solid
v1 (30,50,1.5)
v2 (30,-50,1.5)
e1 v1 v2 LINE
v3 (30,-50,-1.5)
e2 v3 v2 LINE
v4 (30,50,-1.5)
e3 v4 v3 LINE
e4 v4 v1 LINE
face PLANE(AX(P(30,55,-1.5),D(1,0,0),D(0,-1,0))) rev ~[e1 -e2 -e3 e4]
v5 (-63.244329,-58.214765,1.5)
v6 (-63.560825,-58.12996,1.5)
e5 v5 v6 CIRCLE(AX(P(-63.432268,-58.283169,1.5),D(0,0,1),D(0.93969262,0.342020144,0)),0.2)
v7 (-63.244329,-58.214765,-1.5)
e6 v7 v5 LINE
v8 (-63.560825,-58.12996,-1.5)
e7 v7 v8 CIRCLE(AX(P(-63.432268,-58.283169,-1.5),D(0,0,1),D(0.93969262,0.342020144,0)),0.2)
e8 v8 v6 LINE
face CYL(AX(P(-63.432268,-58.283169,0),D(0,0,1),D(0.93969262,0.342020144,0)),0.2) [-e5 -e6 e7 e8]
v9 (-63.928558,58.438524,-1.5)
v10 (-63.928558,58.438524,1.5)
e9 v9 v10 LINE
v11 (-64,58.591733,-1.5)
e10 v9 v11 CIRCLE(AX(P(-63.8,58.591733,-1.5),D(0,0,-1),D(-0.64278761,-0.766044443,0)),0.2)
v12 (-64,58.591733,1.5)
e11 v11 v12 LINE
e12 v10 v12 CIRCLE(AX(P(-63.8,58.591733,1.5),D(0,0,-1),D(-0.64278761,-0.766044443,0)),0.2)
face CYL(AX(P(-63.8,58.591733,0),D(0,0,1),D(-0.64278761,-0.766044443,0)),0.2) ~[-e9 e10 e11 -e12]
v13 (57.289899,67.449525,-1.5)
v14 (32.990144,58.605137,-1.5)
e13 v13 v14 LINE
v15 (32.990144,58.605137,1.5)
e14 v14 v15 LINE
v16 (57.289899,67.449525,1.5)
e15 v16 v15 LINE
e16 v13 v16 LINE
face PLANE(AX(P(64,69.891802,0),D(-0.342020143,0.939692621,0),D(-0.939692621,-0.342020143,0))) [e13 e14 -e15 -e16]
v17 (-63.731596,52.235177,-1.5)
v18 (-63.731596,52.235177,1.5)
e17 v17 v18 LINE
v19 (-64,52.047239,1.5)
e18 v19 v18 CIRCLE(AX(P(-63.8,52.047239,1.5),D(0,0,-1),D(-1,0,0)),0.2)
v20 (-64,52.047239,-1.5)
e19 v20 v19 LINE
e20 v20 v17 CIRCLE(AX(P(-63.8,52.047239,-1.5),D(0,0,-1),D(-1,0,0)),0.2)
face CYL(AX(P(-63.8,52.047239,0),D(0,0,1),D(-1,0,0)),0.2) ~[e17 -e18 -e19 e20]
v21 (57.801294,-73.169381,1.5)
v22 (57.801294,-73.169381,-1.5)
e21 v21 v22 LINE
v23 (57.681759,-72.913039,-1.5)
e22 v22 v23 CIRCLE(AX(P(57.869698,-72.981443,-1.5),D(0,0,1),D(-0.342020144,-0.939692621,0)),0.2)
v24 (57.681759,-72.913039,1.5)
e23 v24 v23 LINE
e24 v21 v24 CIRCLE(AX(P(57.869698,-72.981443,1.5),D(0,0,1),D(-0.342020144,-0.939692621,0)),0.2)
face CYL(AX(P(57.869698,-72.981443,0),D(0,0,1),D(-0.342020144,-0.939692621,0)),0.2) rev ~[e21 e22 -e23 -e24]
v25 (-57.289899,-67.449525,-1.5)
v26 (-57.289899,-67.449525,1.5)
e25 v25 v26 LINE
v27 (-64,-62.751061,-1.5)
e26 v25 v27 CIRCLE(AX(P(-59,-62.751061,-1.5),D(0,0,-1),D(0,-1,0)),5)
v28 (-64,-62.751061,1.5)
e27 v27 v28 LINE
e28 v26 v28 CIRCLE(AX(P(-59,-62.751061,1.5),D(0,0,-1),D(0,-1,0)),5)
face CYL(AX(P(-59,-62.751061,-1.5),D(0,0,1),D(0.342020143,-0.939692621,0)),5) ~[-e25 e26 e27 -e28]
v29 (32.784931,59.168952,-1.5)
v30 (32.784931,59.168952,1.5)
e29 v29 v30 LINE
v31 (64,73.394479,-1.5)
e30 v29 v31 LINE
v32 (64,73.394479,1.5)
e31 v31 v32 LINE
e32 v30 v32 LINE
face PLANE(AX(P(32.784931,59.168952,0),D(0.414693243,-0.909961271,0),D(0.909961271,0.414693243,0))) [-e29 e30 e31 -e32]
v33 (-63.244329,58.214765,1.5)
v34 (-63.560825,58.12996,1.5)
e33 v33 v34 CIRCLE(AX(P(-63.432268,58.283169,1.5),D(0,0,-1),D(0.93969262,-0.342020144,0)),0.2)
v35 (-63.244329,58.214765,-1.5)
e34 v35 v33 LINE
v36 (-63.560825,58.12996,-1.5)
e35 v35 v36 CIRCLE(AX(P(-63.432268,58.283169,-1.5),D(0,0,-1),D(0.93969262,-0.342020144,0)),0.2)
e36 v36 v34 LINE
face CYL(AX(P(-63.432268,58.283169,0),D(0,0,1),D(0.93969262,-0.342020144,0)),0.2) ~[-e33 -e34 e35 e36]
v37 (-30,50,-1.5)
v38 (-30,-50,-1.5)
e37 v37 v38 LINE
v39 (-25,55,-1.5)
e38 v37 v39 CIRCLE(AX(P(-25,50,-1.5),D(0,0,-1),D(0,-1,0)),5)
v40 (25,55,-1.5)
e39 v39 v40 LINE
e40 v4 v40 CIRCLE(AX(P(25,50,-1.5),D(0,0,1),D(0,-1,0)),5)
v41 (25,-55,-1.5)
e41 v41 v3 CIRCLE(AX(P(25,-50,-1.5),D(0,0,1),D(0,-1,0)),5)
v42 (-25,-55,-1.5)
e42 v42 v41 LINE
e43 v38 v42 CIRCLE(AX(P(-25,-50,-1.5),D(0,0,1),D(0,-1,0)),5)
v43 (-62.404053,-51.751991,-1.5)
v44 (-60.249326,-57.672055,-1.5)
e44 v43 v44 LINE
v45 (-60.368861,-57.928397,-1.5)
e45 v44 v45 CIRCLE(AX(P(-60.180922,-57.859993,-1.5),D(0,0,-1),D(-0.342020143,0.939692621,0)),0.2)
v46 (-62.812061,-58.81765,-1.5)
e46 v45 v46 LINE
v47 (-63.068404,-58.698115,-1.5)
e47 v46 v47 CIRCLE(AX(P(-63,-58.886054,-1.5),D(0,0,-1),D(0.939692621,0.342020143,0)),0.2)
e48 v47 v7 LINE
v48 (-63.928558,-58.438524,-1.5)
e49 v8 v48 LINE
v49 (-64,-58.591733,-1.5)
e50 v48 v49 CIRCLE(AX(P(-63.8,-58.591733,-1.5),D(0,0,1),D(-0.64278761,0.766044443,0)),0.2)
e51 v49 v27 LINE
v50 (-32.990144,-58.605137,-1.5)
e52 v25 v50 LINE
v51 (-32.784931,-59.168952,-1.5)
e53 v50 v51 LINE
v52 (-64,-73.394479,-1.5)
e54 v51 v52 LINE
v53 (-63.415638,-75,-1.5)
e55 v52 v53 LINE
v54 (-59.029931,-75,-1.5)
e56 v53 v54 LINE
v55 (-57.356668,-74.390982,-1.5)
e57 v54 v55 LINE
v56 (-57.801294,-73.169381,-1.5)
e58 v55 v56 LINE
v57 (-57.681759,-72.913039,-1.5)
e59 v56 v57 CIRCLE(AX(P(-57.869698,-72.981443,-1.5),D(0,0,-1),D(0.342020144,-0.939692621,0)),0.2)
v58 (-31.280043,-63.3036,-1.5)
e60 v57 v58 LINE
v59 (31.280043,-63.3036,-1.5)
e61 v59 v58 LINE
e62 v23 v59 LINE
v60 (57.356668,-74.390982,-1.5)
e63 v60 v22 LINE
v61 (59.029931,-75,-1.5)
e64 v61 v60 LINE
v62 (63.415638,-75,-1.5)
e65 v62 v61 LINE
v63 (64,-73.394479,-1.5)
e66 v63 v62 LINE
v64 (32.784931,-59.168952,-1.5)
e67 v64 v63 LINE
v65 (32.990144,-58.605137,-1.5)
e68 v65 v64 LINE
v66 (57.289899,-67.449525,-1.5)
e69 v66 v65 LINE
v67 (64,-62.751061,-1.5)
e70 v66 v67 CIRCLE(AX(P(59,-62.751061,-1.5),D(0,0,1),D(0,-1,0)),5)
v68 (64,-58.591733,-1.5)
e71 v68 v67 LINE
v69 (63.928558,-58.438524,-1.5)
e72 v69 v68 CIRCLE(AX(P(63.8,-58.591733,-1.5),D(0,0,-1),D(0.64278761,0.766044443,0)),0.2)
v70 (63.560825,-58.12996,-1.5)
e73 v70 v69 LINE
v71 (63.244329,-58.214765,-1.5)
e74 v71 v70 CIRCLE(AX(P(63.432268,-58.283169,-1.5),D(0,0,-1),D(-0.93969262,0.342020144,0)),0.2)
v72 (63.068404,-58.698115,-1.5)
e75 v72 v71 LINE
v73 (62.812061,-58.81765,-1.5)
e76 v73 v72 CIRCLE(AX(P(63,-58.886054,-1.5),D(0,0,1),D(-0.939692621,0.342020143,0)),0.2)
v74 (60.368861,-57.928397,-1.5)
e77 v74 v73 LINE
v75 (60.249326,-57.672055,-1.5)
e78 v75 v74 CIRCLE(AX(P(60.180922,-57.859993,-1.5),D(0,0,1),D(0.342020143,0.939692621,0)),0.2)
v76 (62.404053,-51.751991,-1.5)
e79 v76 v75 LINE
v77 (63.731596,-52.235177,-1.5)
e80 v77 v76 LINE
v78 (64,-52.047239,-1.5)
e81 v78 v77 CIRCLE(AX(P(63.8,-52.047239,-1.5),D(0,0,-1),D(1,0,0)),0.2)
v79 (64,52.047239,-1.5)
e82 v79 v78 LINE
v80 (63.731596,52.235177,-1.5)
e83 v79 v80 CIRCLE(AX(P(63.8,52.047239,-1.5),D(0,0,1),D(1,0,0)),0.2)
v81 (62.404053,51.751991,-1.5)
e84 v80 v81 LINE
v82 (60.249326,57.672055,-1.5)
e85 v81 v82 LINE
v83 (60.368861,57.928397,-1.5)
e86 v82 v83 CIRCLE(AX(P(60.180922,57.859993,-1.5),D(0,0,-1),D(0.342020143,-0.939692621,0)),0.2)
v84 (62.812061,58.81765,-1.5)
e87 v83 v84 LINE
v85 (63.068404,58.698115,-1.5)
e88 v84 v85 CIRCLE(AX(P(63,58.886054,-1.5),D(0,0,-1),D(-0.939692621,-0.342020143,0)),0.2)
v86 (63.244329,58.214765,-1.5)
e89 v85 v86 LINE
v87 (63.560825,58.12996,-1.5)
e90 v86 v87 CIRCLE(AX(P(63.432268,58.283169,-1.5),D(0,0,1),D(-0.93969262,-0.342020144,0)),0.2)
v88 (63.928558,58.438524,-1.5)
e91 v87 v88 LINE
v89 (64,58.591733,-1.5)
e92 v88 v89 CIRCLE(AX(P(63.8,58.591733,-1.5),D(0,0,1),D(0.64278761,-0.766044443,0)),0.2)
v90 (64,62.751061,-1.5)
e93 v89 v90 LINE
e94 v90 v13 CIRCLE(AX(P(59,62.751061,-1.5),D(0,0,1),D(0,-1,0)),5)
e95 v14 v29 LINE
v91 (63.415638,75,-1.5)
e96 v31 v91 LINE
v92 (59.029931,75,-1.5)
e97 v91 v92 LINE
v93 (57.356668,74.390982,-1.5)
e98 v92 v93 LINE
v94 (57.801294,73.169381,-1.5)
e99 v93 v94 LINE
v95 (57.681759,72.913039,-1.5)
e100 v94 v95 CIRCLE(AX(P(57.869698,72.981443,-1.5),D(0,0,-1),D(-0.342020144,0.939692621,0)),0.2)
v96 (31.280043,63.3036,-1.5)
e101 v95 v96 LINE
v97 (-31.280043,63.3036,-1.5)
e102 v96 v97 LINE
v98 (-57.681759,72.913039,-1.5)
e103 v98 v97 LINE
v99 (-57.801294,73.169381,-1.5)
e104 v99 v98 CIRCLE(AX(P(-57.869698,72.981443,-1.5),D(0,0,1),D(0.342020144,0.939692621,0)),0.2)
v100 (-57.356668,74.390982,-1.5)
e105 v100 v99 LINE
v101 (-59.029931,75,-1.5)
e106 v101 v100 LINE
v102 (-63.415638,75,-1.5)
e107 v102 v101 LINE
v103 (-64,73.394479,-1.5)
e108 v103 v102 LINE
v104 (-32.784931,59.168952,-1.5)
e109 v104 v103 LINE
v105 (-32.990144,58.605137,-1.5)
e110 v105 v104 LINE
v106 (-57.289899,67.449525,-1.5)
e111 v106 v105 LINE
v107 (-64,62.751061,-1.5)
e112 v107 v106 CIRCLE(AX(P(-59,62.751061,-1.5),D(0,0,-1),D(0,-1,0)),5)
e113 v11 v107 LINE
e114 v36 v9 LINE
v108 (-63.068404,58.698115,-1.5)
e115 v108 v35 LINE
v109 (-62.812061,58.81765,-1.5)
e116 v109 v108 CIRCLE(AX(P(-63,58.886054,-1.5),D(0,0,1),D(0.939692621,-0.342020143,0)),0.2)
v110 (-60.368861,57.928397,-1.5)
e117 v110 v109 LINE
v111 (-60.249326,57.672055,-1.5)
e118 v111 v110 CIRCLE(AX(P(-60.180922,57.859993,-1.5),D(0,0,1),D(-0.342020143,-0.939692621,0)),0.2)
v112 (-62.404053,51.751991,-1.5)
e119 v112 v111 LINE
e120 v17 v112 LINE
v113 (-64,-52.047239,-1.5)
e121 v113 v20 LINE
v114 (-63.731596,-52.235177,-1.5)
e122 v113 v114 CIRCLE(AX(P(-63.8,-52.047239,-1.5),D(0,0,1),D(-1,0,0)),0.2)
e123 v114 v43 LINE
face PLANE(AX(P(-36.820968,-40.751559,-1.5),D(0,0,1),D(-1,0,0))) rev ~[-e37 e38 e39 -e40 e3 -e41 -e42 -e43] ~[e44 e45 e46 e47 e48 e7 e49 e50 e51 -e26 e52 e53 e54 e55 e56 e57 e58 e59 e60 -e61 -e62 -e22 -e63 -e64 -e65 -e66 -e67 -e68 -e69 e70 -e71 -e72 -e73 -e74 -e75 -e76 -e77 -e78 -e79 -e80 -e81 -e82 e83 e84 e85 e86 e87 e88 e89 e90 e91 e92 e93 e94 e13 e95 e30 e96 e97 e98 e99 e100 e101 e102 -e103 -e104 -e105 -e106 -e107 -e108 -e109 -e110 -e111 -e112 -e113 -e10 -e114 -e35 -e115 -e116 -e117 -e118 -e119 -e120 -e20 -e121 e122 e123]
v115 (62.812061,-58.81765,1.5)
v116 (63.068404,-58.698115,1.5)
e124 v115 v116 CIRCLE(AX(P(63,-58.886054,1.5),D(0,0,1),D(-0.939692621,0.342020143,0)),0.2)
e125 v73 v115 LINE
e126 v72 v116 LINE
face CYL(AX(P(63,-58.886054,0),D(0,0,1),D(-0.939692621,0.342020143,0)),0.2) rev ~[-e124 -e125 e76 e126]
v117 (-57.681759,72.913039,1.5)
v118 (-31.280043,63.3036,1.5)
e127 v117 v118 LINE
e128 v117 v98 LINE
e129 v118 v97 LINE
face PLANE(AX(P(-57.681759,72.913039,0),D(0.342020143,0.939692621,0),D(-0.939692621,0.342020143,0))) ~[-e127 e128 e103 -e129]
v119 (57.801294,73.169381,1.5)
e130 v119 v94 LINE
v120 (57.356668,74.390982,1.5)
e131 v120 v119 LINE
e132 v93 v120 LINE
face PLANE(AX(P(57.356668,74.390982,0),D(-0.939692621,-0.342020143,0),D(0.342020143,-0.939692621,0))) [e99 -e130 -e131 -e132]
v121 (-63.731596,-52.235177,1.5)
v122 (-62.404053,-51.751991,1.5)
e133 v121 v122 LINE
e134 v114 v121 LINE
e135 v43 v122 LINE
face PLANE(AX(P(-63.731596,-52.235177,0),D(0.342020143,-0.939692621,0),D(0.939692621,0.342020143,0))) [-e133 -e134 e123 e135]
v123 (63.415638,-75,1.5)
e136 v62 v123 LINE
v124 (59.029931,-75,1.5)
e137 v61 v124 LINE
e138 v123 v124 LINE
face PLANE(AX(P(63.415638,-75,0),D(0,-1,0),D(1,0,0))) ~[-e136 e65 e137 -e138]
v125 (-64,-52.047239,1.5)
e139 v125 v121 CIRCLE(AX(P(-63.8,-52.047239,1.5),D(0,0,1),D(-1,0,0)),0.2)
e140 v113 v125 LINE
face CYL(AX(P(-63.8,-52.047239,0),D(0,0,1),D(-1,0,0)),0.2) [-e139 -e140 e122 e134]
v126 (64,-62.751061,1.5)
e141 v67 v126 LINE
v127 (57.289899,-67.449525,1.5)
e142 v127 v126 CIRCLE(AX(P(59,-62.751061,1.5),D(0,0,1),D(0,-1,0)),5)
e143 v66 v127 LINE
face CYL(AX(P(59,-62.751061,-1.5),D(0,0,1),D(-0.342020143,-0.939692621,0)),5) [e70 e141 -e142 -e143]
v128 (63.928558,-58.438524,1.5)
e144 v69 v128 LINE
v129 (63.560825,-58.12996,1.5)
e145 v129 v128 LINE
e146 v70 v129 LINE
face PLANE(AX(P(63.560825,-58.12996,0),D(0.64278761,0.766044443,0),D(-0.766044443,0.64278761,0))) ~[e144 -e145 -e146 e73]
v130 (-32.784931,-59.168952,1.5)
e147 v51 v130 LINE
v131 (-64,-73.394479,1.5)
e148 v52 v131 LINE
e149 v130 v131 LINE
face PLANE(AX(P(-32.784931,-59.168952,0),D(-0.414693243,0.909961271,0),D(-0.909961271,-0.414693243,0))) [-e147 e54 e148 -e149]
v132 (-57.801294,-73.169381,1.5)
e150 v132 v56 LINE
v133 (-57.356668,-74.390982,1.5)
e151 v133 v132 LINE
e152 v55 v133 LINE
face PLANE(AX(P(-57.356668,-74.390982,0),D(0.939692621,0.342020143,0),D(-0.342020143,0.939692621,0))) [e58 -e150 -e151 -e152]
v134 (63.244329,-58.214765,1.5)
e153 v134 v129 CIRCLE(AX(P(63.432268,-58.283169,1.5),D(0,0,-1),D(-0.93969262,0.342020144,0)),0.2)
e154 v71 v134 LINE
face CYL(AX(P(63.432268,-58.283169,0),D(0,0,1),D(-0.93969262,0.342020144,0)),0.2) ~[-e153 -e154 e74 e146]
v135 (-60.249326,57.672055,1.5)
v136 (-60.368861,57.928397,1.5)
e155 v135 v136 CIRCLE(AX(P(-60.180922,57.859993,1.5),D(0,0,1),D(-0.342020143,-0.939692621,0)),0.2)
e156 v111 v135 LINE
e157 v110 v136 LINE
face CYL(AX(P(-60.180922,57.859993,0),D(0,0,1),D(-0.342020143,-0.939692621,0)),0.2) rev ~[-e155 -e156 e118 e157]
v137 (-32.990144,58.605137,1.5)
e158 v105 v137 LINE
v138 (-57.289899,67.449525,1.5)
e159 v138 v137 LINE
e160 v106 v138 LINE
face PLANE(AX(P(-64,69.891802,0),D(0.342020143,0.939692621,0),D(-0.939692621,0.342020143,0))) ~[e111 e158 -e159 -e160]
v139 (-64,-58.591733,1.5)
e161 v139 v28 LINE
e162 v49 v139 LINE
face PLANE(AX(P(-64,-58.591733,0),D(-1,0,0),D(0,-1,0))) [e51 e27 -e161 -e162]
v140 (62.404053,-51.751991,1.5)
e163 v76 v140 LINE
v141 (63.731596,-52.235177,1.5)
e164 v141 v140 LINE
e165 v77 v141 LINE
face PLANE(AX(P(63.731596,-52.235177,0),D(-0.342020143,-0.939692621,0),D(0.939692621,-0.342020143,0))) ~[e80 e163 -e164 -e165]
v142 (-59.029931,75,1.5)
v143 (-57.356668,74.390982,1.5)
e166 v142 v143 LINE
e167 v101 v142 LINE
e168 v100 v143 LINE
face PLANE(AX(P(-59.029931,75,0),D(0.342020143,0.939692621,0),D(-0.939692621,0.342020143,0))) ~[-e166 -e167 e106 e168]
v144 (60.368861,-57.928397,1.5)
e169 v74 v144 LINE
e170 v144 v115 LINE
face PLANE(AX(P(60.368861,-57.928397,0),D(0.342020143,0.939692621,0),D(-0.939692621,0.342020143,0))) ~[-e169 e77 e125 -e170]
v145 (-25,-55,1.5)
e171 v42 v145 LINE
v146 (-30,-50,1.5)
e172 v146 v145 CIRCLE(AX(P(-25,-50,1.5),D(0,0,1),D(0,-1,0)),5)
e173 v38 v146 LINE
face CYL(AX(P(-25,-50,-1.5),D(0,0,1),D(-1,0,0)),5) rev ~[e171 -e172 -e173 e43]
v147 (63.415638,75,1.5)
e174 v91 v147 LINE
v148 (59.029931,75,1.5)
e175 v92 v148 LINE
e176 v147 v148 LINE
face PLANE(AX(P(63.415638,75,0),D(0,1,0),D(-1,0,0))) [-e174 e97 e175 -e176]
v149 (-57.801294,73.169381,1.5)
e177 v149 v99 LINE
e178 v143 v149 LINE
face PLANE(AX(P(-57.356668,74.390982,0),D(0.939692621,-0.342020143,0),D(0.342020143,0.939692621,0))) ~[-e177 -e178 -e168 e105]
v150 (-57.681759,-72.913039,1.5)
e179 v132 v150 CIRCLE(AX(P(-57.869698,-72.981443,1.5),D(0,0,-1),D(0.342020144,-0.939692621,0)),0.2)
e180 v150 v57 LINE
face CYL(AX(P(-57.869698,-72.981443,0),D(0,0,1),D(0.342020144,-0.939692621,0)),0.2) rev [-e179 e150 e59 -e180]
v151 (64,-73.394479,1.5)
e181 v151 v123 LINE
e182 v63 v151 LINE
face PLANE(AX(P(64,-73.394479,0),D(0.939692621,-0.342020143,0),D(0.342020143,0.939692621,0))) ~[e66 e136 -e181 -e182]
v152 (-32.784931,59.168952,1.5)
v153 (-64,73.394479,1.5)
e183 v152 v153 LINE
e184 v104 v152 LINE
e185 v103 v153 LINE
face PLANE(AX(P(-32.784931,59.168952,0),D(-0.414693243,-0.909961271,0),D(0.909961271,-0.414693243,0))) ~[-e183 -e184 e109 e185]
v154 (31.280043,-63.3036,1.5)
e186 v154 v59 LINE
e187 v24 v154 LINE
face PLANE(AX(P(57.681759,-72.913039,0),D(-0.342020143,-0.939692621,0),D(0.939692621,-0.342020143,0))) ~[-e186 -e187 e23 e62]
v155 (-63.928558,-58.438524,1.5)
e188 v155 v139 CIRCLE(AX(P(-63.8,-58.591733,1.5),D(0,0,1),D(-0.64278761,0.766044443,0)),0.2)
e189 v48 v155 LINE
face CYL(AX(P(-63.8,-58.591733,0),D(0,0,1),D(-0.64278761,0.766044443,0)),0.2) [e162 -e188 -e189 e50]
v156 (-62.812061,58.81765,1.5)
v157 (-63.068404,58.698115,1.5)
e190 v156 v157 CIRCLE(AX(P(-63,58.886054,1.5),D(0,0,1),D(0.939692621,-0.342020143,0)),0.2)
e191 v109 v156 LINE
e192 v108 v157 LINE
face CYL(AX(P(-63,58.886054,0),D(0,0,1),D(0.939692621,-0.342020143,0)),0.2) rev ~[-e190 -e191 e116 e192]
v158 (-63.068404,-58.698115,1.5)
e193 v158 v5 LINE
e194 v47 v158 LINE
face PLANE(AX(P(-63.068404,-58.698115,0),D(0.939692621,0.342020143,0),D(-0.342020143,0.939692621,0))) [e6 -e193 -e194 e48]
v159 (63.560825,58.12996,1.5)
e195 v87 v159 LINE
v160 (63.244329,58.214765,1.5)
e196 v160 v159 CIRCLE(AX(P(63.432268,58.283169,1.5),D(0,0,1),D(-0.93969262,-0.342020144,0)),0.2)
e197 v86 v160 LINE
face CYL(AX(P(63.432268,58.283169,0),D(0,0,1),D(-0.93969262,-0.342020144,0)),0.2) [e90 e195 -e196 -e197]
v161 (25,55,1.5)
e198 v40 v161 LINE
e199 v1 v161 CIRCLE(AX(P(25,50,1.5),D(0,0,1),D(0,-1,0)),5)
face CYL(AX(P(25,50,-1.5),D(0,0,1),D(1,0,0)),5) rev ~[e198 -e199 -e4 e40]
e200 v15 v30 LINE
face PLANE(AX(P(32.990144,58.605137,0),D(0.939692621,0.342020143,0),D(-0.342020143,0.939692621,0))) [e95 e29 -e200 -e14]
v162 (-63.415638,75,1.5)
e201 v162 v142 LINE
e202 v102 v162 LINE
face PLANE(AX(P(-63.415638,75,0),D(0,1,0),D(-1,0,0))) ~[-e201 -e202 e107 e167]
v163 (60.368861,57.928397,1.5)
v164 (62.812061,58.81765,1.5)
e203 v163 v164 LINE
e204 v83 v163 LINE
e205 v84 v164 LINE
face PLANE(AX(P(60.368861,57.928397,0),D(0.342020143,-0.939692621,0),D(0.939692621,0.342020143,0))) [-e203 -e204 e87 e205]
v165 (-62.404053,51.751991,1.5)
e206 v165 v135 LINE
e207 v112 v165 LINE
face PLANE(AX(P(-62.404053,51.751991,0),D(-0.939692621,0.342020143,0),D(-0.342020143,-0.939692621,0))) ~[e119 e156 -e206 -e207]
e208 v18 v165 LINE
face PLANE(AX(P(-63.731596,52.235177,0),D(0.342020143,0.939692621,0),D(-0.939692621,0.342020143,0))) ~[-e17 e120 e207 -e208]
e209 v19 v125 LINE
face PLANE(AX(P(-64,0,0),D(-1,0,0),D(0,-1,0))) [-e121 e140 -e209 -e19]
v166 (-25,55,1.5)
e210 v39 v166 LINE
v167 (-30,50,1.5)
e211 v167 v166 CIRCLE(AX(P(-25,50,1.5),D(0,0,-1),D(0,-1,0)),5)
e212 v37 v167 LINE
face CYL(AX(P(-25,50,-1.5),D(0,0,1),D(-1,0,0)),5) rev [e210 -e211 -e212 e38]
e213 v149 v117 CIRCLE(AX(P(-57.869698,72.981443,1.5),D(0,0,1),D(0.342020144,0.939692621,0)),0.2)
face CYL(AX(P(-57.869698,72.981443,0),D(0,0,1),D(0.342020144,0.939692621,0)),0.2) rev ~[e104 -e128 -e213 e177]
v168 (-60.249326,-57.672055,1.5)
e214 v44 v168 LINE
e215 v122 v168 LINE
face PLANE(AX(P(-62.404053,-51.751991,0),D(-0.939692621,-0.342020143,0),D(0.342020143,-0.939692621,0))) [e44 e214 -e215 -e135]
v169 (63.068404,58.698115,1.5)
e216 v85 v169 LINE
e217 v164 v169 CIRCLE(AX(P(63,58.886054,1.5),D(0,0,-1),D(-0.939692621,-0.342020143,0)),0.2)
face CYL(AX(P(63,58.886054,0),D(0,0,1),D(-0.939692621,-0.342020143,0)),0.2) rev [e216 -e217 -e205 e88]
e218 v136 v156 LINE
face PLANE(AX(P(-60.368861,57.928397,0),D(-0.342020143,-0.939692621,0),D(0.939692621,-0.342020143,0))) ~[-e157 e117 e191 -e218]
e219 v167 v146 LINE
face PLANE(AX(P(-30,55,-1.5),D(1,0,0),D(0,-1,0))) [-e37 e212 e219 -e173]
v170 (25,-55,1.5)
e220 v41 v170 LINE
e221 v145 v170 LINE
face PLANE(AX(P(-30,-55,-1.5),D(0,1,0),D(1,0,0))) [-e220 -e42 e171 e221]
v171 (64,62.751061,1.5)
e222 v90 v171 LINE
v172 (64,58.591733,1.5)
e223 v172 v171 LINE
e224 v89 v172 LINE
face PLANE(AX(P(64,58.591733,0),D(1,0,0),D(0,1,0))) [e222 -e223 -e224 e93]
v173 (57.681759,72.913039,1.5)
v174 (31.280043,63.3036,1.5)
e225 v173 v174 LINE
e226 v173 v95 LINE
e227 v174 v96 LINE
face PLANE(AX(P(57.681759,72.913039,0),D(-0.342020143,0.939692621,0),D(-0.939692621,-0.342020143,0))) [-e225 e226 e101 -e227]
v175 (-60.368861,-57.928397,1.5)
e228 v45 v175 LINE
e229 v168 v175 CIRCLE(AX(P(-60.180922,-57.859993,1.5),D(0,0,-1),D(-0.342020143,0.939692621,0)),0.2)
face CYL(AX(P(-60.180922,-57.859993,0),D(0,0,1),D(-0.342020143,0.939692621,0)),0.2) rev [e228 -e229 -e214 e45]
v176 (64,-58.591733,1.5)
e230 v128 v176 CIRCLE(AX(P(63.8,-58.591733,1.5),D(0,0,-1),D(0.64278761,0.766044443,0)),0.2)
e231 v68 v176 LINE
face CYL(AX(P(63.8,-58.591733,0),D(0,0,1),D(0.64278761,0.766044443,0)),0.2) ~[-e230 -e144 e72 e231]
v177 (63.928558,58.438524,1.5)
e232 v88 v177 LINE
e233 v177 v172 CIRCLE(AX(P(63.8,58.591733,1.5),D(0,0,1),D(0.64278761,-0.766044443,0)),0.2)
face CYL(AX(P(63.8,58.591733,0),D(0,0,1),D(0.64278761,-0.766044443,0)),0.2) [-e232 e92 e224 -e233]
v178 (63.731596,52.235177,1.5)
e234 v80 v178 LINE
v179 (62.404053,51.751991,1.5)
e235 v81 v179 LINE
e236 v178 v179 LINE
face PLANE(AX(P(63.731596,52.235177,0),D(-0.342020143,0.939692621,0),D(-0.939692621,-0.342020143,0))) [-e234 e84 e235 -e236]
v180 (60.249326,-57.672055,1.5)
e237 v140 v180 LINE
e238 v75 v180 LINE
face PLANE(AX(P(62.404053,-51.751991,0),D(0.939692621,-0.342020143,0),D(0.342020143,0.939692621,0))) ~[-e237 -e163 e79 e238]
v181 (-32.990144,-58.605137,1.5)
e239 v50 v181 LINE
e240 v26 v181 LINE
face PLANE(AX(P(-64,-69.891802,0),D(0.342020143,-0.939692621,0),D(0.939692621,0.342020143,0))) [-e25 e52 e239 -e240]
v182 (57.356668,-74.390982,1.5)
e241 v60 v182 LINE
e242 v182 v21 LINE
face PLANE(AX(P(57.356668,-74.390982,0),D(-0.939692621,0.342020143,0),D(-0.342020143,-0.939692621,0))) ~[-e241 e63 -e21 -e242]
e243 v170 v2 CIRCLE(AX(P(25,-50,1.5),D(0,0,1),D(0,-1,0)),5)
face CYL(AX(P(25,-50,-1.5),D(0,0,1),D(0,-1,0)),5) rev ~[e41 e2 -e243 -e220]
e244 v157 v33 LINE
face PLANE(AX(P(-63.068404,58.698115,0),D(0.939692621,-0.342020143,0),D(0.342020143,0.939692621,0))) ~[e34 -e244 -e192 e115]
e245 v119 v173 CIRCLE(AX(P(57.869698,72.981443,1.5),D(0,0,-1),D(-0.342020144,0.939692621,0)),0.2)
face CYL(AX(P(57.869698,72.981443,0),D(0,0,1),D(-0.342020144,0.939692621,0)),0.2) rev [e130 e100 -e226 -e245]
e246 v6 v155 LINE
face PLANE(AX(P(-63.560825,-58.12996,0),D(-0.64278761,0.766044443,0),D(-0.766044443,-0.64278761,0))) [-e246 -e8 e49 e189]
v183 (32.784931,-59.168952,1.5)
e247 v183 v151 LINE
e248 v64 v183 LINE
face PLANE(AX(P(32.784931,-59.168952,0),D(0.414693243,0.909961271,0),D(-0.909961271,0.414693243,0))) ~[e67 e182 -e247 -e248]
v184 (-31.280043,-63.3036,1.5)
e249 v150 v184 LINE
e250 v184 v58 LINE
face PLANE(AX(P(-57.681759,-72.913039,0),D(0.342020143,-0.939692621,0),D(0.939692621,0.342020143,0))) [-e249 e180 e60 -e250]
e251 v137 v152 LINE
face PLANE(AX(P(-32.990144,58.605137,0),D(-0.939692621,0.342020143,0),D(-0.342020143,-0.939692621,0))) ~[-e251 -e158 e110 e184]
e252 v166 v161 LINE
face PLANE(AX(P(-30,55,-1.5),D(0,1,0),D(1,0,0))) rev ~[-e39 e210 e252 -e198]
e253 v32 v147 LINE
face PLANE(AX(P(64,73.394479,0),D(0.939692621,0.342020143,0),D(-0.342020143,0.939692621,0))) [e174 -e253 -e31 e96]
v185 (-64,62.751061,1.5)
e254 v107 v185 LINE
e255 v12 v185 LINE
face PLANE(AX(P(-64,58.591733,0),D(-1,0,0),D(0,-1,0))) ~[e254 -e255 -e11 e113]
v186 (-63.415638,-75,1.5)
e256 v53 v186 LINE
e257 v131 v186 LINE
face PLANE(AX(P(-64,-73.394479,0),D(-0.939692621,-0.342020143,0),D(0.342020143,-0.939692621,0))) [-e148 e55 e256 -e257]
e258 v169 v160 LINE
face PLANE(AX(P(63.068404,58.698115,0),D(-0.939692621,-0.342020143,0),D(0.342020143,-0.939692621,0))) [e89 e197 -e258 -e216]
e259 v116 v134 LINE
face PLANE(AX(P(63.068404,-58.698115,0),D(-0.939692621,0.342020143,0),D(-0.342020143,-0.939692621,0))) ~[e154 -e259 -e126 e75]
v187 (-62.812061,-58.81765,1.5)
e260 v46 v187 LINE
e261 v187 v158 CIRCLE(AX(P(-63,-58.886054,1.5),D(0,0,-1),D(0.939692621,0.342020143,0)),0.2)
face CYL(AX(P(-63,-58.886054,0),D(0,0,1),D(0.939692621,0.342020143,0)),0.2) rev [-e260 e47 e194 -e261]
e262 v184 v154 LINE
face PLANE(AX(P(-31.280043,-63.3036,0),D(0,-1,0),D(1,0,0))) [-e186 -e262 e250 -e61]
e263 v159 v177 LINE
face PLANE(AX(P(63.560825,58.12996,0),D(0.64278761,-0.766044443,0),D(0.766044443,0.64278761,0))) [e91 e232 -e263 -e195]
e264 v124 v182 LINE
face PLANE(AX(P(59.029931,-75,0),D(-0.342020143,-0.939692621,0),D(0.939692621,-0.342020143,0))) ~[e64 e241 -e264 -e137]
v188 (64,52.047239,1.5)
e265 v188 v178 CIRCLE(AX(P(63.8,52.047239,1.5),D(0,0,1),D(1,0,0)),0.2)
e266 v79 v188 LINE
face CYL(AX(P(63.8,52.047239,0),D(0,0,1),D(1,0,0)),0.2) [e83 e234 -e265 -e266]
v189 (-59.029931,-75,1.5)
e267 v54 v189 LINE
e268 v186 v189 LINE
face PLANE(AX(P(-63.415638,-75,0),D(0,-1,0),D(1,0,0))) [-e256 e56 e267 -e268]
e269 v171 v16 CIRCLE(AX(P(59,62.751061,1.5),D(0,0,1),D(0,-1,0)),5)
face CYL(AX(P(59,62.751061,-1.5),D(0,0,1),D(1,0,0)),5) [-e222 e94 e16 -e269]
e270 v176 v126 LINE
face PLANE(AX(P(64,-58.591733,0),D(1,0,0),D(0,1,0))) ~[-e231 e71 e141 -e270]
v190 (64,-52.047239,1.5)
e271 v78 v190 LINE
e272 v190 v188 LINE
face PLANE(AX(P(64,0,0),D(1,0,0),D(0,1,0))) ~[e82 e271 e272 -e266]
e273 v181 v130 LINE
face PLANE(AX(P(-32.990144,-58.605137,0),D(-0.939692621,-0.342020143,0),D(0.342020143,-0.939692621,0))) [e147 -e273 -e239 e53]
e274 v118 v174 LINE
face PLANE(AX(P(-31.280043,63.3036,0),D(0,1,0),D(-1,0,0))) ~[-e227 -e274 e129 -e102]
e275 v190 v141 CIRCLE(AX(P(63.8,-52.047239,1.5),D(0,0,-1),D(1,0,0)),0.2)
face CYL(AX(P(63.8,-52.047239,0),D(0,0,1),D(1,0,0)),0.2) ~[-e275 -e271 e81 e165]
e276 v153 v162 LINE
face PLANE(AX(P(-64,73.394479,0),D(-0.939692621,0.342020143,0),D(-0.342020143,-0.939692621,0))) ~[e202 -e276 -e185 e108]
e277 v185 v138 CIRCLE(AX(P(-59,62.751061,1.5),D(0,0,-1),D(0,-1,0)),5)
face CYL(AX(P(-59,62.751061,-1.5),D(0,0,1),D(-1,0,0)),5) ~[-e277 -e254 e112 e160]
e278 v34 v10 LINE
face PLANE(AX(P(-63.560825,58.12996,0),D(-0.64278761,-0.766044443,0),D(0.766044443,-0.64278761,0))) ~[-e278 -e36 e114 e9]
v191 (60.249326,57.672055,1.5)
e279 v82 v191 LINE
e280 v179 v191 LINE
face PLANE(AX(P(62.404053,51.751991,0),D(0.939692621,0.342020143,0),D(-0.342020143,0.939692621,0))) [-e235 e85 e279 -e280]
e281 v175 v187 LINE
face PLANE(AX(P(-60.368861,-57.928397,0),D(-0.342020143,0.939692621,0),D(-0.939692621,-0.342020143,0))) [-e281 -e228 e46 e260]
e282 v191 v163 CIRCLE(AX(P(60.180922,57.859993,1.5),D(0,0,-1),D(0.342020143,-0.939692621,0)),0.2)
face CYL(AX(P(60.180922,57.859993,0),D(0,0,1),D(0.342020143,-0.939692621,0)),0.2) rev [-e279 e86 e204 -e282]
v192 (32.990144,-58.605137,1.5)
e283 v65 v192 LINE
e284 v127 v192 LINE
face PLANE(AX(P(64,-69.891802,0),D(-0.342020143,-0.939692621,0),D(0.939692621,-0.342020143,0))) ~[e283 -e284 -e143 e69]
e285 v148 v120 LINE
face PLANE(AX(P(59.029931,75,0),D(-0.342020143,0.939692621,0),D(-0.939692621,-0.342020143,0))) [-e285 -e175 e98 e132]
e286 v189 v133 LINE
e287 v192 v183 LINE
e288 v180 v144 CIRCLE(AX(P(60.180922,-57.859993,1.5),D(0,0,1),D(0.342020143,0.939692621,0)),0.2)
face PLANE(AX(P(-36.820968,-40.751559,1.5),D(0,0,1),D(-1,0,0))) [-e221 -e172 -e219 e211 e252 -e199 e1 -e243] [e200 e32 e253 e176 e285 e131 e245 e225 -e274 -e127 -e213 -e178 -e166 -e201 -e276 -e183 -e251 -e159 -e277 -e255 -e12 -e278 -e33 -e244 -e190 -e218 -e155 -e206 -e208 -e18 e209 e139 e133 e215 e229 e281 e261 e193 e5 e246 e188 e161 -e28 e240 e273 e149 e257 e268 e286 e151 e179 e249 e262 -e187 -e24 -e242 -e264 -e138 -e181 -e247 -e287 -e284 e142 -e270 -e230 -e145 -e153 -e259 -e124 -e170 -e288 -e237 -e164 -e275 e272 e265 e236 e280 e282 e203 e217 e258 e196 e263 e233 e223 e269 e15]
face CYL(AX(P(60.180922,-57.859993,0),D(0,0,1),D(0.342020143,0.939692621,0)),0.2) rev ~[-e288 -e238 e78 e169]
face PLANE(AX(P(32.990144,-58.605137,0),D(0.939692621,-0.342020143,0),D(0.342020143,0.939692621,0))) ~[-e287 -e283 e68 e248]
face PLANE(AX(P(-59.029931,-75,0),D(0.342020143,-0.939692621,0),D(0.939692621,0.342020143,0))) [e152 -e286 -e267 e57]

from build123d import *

# Parameters (mm, degrees)
F1_DEPTH = 1.5
F4_W     = 60
F4_H     = 110
F5_DEPTH = 3
F6_R     = 5
F7_R     = 5


# Not quite as in the source:
# - a feature names something its author has since deleted; it is built from what else it names


with BuildPart() as f1:
    # F0 (on Top) → F1 (new body, symmetric)
    with BuildSketch(Plane.XY):
        with BuildLine():
            Line((31.2800427974, 63.3035998776), (0, 63.3035998776))
            Line((0, 63.3035998776), (0, 0))
            Line((0, 0), (64, 0))
            Line((64, 0), (64, 52.0472386562))
            ThreePointArc((64, 52.0472386562), (63.9147152873, 52.211069065), (63.7315959713, 52.2351771803))
            Line((63.7315959713, 52.2351771803), (62.4040530693, 51.7519910793))
            Line((62.4040530693, 51.7519910793), (60.2493261663, 57.6720545902))
            ThreePointArc((60.2493261663, 57.6720545902), (59.9996605802, 57.9445167667), (60.3688606618, 57.9283971431))
            Line((60.3688606618, 57.9283971431), (62.8120614758, 58.8176495157))
            ThreePointArc((62.8120614758, 58.8176495157), (63.0845236523, 59.0673151018), (63.0684040287, 58.6981150202))
            Line((63.0684040287, 58.6981150202), (63.2443290661, 58.2147649522))
            ThreePointArc((63.2443290661, 58.2147649522), (63.3805037813, 58.0899838157), (63.5608251122, 58.1299600923))
            Line((63.5608251122, 58.1299600923), (63.9285575219, 58.4385242216))
            ThreePointArc((63.9285575219, 58.4385242216), (63.9812615574, 58.5072094579), (64, 58.5917331103))
            Line((64, 58.5917331103), (64, 69.8918015034))
            Line((64, 69.8918015034), (32.9901435141, 58.6051367736))
            Line((32.9901435141, 58.6051367736), (32.7849314281, 59.1689523461))
            Line((32.7849314281, 59.1689523461), (64, 73.3944786626))
            Line((64, 73.3944786626), (63.4156380227, 75))
            Line((63.4156380227, 75), (59.0299314225, 75))
            Line((59.0299314225, 75), (57.3566676351, 74.3909817873))
            Line((57.3566676351, 74.3909817873), (57.8012938214, 73.1693813803))
            ThreePointArc((57.8012938214, 73.1693813803), (58.0509594075, 72.8969192038), (57.681759326, 72.9130388275))
            Line((57.681759326, 72.9130388275), (31.2800427974, 63.3035998776))
        make_face()
    extrude(amount=F1_DEPTH, both=True)

    # F2: F1 across face


with BuildPart() as f1_1:
    add(f1.part)
    add(f1.part.mirror(Plane(origin=(0, 31.6517999388, 0), x_dir=(0, -1, 0), z_dir=(-1, 0, 0))))

    # F3: F1 across face


with BuildPart() as f1_2:
    add(f1_1.part)
    add(f1_1.part.mirror(Plane.XZ))

    # F4 (on face) → F5 (cut, through all)
    with BuildSketch(Plane(origin=(0, 0, -1.5), x_dir=(1, 0, 0), z_dir=(0, 0, -1))):
        Rectangle(F4_W, F4_H)
    extrude(amount=-F5_DEPTH, mode=Mode.SUBTRACT)

    # F6
    f6_edges = [f1_2.edges().sort_by_distance(p)[0] for p in [
        (-64, -69.891802, 0),
        (64, -69.891802, 0),
        (64, 69.891802, 0),
        (-64, 69.891802, 0),
    ]]
    fillet(f6_edges, radius=F6_R)

    # F7
    f7_edges = [f1_2.edges().sort_by_distance(p)[0] for p in [
        (-30, 55, 0),
        (-30, -55, 0),
        (30, -55, 0),
        (30, 55, 0),
    ]]
    fillet(f7_edges, radius=F7_R)


solid = f1_2.part
